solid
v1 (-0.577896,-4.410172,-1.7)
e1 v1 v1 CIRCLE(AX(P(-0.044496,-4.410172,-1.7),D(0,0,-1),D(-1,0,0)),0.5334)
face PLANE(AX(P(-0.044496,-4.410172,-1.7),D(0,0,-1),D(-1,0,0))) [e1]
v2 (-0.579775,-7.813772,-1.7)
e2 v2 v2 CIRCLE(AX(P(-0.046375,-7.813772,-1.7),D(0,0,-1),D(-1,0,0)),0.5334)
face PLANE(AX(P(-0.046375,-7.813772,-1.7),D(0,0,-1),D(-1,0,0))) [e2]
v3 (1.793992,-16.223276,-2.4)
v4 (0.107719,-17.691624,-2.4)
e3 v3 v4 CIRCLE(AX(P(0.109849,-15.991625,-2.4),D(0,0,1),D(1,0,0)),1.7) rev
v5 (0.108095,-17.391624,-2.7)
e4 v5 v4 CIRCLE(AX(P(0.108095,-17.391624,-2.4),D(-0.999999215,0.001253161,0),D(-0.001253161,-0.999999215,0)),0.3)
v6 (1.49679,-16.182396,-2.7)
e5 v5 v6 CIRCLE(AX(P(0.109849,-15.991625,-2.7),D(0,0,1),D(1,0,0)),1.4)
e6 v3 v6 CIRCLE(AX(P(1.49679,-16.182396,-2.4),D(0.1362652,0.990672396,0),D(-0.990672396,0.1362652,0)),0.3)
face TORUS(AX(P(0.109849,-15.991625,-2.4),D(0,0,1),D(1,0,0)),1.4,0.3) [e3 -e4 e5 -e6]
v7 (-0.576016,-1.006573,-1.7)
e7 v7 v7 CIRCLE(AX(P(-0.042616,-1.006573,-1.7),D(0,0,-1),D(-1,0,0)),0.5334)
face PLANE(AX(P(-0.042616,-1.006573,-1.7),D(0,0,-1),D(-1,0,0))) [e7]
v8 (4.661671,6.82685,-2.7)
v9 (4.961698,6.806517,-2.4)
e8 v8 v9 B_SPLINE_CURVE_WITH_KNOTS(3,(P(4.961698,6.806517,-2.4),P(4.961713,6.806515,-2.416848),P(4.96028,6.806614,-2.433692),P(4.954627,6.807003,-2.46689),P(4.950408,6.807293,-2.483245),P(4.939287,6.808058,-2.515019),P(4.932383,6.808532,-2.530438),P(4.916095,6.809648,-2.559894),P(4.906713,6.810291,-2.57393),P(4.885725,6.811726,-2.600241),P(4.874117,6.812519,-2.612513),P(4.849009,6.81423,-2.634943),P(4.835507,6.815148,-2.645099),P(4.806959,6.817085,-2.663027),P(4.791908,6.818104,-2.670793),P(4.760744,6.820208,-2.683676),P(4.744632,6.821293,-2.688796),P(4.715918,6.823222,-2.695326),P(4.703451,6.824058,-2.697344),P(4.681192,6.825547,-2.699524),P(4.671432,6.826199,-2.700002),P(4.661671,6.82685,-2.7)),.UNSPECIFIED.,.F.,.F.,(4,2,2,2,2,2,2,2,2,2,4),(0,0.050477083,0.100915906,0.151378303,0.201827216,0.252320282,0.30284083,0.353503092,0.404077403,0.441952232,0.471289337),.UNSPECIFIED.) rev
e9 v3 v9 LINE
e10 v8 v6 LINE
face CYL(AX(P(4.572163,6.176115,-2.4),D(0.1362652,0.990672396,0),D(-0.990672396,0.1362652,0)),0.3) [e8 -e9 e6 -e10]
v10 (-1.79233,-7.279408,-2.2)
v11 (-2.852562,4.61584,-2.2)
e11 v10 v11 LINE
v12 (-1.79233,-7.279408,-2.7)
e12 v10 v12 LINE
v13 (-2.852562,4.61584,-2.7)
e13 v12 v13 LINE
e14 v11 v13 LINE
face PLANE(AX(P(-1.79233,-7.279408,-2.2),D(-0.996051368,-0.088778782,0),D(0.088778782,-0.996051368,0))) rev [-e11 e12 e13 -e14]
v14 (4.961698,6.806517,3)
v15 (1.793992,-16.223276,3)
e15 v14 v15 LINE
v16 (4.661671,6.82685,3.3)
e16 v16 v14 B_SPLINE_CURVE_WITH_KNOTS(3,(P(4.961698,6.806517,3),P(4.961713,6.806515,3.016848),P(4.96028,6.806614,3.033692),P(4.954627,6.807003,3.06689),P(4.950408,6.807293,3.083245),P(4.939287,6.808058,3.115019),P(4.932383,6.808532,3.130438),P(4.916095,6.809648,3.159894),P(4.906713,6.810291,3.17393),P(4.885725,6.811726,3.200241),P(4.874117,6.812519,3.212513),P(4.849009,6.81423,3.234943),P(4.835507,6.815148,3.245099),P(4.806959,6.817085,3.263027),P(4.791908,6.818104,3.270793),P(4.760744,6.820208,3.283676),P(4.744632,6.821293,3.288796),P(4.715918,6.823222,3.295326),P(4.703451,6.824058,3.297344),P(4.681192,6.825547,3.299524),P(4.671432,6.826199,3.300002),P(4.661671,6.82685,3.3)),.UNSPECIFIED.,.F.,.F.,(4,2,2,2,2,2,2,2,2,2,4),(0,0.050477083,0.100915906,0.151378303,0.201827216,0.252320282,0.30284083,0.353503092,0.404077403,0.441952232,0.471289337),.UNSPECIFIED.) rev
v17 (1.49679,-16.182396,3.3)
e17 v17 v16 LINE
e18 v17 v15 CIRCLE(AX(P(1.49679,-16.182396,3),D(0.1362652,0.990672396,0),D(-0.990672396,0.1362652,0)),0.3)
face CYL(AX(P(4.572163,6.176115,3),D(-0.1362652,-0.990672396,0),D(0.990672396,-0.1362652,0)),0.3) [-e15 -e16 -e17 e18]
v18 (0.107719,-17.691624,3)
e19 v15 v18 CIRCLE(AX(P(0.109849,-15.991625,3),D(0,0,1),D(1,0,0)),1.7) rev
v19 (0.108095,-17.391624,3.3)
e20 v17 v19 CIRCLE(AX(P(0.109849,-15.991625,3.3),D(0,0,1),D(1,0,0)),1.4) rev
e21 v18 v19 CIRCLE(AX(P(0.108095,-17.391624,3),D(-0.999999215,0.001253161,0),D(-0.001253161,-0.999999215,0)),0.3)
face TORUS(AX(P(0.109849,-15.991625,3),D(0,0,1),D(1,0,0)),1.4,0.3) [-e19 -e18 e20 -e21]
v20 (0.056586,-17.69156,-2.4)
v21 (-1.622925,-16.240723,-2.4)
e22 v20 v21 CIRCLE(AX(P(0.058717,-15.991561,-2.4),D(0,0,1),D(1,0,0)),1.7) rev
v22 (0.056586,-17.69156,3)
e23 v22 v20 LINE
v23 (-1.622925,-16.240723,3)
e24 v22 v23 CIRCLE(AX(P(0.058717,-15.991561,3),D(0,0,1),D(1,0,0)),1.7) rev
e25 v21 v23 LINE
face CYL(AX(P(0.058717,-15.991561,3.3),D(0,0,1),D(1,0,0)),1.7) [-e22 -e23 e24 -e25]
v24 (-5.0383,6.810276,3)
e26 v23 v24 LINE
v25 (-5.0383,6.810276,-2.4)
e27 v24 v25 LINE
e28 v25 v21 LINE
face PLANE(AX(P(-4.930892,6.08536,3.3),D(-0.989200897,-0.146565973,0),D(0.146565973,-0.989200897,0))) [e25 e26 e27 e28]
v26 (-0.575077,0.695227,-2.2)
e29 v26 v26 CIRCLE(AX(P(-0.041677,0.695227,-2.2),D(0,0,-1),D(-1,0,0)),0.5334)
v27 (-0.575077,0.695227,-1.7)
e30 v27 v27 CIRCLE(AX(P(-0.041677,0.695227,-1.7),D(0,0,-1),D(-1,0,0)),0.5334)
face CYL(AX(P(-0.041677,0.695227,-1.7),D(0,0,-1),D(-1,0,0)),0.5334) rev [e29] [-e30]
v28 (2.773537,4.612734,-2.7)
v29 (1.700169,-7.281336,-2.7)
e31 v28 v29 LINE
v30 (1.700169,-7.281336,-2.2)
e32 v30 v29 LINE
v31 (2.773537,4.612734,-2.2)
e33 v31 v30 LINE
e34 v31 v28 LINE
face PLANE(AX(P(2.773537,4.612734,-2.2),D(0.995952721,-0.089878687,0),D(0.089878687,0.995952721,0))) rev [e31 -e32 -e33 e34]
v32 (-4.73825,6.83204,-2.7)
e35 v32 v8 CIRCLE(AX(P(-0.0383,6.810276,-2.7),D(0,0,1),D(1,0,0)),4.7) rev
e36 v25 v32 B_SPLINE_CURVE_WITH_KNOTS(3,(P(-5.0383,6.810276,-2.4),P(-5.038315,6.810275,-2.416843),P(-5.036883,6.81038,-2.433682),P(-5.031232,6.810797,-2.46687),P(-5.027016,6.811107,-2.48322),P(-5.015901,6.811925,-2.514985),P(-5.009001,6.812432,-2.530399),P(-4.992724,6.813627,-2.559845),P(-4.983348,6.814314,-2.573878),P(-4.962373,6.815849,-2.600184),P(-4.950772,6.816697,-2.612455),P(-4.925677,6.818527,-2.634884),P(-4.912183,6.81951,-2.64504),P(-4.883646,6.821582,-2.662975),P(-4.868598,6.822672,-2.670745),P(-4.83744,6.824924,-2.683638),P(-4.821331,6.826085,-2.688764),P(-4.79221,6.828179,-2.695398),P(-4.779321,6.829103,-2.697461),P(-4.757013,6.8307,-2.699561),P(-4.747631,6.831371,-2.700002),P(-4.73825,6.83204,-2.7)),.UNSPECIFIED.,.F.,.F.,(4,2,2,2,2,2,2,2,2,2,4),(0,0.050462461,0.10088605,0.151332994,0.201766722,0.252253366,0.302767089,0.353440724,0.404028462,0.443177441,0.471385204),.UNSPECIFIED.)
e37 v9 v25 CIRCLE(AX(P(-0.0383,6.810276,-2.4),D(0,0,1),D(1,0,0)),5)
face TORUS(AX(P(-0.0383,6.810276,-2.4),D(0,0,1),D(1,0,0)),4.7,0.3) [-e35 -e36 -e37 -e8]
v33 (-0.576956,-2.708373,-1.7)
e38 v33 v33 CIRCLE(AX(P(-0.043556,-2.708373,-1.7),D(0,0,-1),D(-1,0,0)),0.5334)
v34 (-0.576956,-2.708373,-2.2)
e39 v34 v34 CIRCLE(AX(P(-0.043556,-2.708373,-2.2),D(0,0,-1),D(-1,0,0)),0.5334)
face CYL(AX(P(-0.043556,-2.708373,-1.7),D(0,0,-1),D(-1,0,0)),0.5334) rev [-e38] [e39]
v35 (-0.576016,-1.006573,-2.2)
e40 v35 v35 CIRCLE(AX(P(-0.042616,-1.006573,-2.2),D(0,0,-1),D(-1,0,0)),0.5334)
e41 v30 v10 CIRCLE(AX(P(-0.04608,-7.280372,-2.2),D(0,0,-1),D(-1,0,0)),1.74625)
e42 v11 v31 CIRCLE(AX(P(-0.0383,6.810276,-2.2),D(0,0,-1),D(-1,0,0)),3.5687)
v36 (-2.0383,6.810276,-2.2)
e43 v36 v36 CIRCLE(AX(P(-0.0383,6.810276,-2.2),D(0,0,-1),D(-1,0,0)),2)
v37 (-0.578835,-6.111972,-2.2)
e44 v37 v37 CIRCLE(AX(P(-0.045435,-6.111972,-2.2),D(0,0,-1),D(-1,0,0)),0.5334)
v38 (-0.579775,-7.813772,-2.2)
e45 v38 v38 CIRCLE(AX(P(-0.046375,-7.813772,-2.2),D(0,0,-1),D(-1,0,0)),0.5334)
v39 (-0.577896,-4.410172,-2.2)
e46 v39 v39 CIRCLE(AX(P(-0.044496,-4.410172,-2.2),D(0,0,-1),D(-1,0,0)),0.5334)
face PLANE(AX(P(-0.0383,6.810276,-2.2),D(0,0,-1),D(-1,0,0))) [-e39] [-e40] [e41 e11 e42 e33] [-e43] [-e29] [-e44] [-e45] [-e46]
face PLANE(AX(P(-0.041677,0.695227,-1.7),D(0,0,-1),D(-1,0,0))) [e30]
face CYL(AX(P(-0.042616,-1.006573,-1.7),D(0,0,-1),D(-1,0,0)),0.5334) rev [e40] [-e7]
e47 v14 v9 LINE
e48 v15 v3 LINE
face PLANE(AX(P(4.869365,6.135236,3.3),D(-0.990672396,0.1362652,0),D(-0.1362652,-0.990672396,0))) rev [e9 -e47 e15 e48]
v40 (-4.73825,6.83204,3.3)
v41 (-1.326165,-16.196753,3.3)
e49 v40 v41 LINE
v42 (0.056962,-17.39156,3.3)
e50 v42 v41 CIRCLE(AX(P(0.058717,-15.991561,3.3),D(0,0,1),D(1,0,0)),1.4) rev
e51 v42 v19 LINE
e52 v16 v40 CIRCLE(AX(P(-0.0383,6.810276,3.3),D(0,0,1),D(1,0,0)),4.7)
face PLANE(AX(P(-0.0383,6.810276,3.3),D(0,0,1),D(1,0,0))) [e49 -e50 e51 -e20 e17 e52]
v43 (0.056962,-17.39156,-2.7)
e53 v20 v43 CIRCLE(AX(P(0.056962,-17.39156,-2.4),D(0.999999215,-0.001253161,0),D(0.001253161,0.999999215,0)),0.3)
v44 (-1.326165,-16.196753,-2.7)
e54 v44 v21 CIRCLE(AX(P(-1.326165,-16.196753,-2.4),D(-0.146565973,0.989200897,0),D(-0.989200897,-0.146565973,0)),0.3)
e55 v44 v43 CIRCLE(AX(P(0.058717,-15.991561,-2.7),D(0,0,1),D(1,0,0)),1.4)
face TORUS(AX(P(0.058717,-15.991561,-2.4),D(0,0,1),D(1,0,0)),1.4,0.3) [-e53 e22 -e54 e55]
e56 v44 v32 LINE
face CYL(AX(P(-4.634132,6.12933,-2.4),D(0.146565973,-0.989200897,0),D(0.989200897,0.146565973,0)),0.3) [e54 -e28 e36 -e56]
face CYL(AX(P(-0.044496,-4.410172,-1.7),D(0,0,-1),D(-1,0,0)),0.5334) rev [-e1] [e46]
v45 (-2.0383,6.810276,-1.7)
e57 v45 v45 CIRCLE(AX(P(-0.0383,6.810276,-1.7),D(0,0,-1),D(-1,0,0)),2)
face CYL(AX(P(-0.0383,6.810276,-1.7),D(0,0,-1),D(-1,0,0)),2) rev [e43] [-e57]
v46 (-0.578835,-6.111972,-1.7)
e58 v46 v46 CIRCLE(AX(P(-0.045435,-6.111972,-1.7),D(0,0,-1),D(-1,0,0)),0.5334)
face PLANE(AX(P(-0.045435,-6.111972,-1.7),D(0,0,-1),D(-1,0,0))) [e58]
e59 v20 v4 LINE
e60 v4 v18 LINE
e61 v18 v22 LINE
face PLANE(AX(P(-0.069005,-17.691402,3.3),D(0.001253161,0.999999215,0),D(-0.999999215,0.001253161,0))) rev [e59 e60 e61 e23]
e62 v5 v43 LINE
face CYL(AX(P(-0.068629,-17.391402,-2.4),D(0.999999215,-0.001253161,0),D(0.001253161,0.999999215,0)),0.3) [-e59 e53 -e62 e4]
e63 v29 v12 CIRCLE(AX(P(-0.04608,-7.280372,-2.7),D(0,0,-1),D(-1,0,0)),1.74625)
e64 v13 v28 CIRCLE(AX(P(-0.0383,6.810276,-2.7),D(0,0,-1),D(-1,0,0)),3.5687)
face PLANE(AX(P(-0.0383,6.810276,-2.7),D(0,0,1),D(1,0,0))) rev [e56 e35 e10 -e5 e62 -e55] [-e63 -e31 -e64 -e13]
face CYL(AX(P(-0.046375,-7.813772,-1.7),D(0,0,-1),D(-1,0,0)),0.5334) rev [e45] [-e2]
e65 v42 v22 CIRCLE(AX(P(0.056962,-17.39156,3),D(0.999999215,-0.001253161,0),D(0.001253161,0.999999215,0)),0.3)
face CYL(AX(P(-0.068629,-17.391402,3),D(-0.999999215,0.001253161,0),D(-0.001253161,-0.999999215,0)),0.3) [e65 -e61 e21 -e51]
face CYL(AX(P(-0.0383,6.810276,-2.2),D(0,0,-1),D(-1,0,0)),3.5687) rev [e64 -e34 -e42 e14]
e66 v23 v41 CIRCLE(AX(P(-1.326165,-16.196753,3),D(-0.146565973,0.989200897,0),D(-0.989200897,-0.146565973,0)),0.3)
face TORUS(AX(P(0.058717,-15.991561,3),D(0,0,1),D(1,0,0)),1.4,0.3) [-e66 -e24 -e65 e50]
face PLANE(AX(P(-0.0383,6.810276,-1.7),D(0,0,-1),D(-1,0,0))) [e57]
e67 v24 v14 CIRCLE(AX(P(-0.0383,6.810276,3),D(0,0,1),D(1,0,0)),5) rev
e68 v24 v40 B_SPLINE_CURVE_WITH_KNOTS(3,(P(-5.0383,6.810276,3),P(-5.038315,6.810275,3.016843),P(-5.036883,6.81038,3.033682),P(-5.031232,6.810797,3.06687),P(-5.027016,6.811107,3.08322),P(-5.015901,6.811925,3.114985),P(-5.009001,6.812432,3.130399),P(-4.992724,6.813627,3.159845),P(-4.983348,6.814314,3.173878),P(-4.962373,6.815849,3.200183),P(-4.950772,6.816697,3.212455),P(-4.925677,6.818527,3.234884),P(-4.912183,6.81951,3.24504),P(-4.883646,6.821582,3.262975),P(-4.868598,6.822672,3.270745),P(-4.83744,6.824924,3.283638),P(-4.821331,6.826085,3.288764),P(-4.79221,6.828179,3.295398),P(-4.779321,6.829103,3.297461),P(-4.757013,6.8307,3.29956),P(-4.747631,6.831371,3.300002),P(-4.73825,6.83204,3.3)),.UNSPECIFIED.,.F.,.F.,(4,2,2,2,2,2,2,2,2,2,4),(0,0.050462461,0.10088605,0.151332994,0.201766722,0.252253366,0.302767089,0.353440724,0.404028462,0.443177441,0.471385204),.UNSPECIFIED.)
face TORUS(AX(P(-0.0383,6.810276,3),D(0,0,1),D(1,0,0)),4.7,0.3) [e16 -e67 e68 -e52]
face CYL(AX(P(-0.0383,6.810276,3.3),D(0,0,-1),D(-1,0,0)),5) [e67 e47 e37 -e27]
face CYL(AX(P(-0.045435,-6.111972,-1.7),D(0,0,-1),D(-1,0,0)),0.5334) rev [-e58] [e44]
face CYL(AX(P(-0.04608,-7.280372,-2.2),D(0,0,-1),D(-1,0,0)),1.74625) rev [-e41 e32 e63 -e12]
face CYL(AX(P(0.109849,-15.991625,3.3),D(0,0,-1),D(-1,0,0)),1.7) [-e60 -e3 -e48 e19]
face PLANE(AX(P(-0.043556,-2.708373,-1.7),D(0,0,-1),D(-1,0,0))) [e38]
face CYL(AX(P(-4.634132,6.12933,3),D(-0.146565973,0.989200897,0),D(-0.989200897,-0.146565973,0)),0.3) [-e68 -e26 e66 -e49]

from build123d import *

# Parameters (mm, degrees)
BOSS_EXTRUDE1_DEPTH = 0.6
FILLET3_R           = 0.03
FILLET4_R           = 0.17
SCALE2_SCALE        = 10
SKETCH4_R           = 0.5334
SKETCH4_R_2         = 2
CUT_EXTRUDE5_DEPTH  = 1
SKETCH4_3_R         = 0.5334
SKETCH4_3_R_2       = 2
CUT_EXTRUDE6_DEPTH  = 0.5


with BuildPart() as part:
    # Sketch1 → Boss-Extrude1 (new body)
    with BuildSketch(Plane.XY):
        with BuildLine():
            Line((-0.136993219, -2.45), (0.163006781, -2.450375949))
            Line((0.163006781, -2.450375949), (0.499999859, -0.000375949))
            ThreePointArc((0.499999859, -0.000375949), (0.000187974, 0.499999965), (-0.5, 0))
            Line((-0.5, 0), (-0.136993219, -2.45))
        make_face()
    extrude(amount=BOSS_EXTRUDE1_DEPTH)

    # Fillet3
    fillet3_edges = [part.edges().sort_by_distance(p)[0] for p in [
        (0.33150332, -1.225375949, 0.6),
        (0.000187974, 0.499999965, 0.6),
        (-0.318496609, -1.225, 0.6),
        (0.000187974, 0.499999965, 0),
        (0.33150332, -1.225375949, 0),
        (0.013006781, -2.450187974, 0),
        (-0.318496609, -1.225, 0),
        (0.013006781, -2.450187974, 0.6),
    ]]
    fillet(fillet3_edges, radius=FILLET3_R)

    # Fillet4
    # the kernel refuses this fillet: 0.17 mm, written as the material it takes off along each edge
    with BuildSketch(Plane(origin=(0.009701663, -2.280183699, 0), x_dir=(-0.001253160871338018, -0.9999992147936071, 0), z_dir=(0.9999992147936071, -0.001253160871338018, 0))) as fillet4_piece_1:
        with BuildLine():
            CenterArc((0.14, -0.03), 0.03, 0, 90)
            Line((0.17, -0.03), (0.17, 0))
            Line((0.17, 0), (0.14, 0))
        make_face()
    revolve(axis=Axis((0.009701663, -2.280183699, 0), (0, 0, -1)), revolution_arc=81.500227405, mode=Mode.SUBTRACT)
    with BuildSketch(Plane(origin=(0.014814914, -2.280190107, 0), x_dir=(0.9906723955714478, -0.1362651997126514, 0), z_dir=(0.1362651997126514, 0.9906723955714478, 0))) as fillet4_piece_2:
        with BuildLine():
            CenterArc((0.14, -0.03), 0.03, 0, 90)
            Line((0.17, -0.03), (0.17, 0))
            Line((0.17, 0), (0.14, 0))
        make_face()
    revolve(axis=Axis((0.014814914, -2.280190107, 0), (0, 0, -1)), revolution_arc=82.240014231, mode=Mode.SUBTRACT)
    with BuildSketch(Plane(origin=(0.014814914, -2.280190107, 0.6), x_dir=(-0.001253160871338018, -0.9999992147936071, 0), z_dir=(-0.9999992147936071, 0.001253160871338018, 0))) as fillet4_piece_3:
        with BuildLine():
            CenterArc((0.14, -0.03), 0.03, 0, 90)
            Line((0.17, -0.03), (0.17, 0))
            Line((0.17, 0), (0.14, 0))
        make_face()
    revolve(axis=Axis((0.014814914, -2.280190107, 0.6), (0, 0, 1)), revolution_arc=82.240014231, mode=Mode.SUBTRACT)
    with BuildSketch(Plane(origin=(0.009701663, -2.280183699, 0.6), x_dir=(-0.9892008974747571, -0.14656597297850232, 0), z_dir=(-0.14656597297850232, 0.9892008974747571, 0))) as fillet4_piece_4:
        with BuildLine():
            CenterArc((0.14, -0.03), 0.03, 0, 90)
            Line((0.17, -0.03), (0.17, 0))
            Line((0.17, 0), (0.14, 0))
        make_face()
    revolve(axis=Axis((0.009701663, -2.280183699, 0.6), (0, 0, 1)), revolution_arc=81.500227405, mode=Mode.SUBTRACT)
    with BuildSketch(Plane(origin=(0.163006781, -2.450375949, 0), x_dir=(-0.999999214793607, 0.001253160871339251, 0), z_dir=(0, 0, 1))) as fillet4_piece_5:
        with BuildLine():
            CenterArc((FILLET4_R * 0.872970713312, -FILLET4_R), FILLET4_R, 90, 82.240014231)
            Line((-FILLET4_R * 0.117871666593, -FILLET4_R * 0.864976379166), (0, 0))
            Line((0, 0), (FILLET4_R * 0.872970713312, 0))
        make_face()
    extrude(amount=0.6, mode=Mode.SUBTRACT)
    with BuildSketch(Plane(origin=(-0.136993219, -2.45, 0), x_dir=(-0.14656597297850246, 0.9892008974747571, 0), z_dir=(0, 0, 1))) as fillet4_piece_6:
        with BuildLine():
            CenterArc((FILLET4_R * 0.861658584387, -FILLET4_R), FILLET4_R, 90, 81.500227405)
            Line((-FILLET4_R * 0.127357865618, -FILLET4_R * 0.852194514247), (0, 0))
            Line((0, 0), (FILLET4_R * 0.861658584387, 0))
        make_face()
    extrude(amount=0.6, mode=Mode.SUBTRACT)


with BuildPart() as part_1:
    # Scale2: scaled about (0.00425557, -0.756697726, 0.299999998)
    add(part.part.scale(SCALE2_SCALE).moved(Location((-0.03830013, 6.810279534, -2.699999982))))

    # Sketch4 → Cut-Extrude5 (cut)
    with BuildSketch(Plane(origin=(0, 0, -2.70000001), x_dir=(-1, 0, 0), z_dir=(0, 0, -1))):
        with Locations((0.041676609, 0.695226981)):
            Circle(SKETCH4_R)
        with Locations((0.042616275, -1.00657276)):
            Circle(SKETCH4_R)
        with Locations((0.04355594, -2.7083725)):
            Circle(SKETCH4_R)
        with Locations((0.044495606, -4.410172241)):
            Circle(SKETCH4_R)
        with Locations((0.045435271, -6.111971981)):
            Circle(SKETCH4_R)
        with Locations((0.046374936, -7.813771722)):
            Circle(SKETCH4_R)
        with Locations((0.038300124, 6.810276049)):
            Circle(SKETCH4_R_2)
    extrude(amount=-CUT_EXTRUDE5_DEPTH, mode=Mode.SUBTRACT)

    # Sketch4<3> → Cut-Extrude6 (cut)
    with BuildSketch(Plane(origin=(0, 0, -2.70000001), x_dir=(-1, 0, 0), z_dir=(0, 0, -1))):
        with BuildLine():
            Line((1.792330148, -7.279407594), (2.852562233, 4.61584025))
            ThreePointArc((2.852562233, 4.61584025), (0.036329632, 10.378975505), (-2.77353691, 4.612733744))
            Line((-2.77353691, 4.612733744), (-1.700169319, -7.281336012))
            ThreePointArc((-1.700169319, -7.281336012), (0.047044623, -9.026621537), (1.792330148, -7.279407594))
        make_face()
        with Locations((0.041676609, 0.695226981)):
            Circle(SKETCH4_3_R, mode=Mode.SUBTRACT)
        with Locations((0.042616275, -1.00657276)):
            Circle(SKETCH4_3_R, mode=Mode.SUBTRACT)
        with Locations((0.04355594, -2.7083725)):
            Circle(SKETCH4_3_R, mode=Mode.SUBTRACT)
        with Locations((0.044495606, -4.410172241)):
            Circle(SKETCH4_3_R, mode=Mode.SUBTRACT)
        with Locations((0.045435271, -6.111971981)):
            Circle(SKETCH4_3_R, mode=Mode.SUBTRACT)
        with Locations((0.046374936, -7.813771722)):
            Circle(SKETCH4_3_R, mode=Mode.SUBTRACT)
        with Locations((0.038300124, 6.810276049)):
            Circle(SKETCH4_3_R_2, mode=Mode.SUBTRACT)
    extrude(amount=-CUT_EXTRUDE6_DEPTH, mode=Mode.SUBTRACT)


solid = part_1.part
